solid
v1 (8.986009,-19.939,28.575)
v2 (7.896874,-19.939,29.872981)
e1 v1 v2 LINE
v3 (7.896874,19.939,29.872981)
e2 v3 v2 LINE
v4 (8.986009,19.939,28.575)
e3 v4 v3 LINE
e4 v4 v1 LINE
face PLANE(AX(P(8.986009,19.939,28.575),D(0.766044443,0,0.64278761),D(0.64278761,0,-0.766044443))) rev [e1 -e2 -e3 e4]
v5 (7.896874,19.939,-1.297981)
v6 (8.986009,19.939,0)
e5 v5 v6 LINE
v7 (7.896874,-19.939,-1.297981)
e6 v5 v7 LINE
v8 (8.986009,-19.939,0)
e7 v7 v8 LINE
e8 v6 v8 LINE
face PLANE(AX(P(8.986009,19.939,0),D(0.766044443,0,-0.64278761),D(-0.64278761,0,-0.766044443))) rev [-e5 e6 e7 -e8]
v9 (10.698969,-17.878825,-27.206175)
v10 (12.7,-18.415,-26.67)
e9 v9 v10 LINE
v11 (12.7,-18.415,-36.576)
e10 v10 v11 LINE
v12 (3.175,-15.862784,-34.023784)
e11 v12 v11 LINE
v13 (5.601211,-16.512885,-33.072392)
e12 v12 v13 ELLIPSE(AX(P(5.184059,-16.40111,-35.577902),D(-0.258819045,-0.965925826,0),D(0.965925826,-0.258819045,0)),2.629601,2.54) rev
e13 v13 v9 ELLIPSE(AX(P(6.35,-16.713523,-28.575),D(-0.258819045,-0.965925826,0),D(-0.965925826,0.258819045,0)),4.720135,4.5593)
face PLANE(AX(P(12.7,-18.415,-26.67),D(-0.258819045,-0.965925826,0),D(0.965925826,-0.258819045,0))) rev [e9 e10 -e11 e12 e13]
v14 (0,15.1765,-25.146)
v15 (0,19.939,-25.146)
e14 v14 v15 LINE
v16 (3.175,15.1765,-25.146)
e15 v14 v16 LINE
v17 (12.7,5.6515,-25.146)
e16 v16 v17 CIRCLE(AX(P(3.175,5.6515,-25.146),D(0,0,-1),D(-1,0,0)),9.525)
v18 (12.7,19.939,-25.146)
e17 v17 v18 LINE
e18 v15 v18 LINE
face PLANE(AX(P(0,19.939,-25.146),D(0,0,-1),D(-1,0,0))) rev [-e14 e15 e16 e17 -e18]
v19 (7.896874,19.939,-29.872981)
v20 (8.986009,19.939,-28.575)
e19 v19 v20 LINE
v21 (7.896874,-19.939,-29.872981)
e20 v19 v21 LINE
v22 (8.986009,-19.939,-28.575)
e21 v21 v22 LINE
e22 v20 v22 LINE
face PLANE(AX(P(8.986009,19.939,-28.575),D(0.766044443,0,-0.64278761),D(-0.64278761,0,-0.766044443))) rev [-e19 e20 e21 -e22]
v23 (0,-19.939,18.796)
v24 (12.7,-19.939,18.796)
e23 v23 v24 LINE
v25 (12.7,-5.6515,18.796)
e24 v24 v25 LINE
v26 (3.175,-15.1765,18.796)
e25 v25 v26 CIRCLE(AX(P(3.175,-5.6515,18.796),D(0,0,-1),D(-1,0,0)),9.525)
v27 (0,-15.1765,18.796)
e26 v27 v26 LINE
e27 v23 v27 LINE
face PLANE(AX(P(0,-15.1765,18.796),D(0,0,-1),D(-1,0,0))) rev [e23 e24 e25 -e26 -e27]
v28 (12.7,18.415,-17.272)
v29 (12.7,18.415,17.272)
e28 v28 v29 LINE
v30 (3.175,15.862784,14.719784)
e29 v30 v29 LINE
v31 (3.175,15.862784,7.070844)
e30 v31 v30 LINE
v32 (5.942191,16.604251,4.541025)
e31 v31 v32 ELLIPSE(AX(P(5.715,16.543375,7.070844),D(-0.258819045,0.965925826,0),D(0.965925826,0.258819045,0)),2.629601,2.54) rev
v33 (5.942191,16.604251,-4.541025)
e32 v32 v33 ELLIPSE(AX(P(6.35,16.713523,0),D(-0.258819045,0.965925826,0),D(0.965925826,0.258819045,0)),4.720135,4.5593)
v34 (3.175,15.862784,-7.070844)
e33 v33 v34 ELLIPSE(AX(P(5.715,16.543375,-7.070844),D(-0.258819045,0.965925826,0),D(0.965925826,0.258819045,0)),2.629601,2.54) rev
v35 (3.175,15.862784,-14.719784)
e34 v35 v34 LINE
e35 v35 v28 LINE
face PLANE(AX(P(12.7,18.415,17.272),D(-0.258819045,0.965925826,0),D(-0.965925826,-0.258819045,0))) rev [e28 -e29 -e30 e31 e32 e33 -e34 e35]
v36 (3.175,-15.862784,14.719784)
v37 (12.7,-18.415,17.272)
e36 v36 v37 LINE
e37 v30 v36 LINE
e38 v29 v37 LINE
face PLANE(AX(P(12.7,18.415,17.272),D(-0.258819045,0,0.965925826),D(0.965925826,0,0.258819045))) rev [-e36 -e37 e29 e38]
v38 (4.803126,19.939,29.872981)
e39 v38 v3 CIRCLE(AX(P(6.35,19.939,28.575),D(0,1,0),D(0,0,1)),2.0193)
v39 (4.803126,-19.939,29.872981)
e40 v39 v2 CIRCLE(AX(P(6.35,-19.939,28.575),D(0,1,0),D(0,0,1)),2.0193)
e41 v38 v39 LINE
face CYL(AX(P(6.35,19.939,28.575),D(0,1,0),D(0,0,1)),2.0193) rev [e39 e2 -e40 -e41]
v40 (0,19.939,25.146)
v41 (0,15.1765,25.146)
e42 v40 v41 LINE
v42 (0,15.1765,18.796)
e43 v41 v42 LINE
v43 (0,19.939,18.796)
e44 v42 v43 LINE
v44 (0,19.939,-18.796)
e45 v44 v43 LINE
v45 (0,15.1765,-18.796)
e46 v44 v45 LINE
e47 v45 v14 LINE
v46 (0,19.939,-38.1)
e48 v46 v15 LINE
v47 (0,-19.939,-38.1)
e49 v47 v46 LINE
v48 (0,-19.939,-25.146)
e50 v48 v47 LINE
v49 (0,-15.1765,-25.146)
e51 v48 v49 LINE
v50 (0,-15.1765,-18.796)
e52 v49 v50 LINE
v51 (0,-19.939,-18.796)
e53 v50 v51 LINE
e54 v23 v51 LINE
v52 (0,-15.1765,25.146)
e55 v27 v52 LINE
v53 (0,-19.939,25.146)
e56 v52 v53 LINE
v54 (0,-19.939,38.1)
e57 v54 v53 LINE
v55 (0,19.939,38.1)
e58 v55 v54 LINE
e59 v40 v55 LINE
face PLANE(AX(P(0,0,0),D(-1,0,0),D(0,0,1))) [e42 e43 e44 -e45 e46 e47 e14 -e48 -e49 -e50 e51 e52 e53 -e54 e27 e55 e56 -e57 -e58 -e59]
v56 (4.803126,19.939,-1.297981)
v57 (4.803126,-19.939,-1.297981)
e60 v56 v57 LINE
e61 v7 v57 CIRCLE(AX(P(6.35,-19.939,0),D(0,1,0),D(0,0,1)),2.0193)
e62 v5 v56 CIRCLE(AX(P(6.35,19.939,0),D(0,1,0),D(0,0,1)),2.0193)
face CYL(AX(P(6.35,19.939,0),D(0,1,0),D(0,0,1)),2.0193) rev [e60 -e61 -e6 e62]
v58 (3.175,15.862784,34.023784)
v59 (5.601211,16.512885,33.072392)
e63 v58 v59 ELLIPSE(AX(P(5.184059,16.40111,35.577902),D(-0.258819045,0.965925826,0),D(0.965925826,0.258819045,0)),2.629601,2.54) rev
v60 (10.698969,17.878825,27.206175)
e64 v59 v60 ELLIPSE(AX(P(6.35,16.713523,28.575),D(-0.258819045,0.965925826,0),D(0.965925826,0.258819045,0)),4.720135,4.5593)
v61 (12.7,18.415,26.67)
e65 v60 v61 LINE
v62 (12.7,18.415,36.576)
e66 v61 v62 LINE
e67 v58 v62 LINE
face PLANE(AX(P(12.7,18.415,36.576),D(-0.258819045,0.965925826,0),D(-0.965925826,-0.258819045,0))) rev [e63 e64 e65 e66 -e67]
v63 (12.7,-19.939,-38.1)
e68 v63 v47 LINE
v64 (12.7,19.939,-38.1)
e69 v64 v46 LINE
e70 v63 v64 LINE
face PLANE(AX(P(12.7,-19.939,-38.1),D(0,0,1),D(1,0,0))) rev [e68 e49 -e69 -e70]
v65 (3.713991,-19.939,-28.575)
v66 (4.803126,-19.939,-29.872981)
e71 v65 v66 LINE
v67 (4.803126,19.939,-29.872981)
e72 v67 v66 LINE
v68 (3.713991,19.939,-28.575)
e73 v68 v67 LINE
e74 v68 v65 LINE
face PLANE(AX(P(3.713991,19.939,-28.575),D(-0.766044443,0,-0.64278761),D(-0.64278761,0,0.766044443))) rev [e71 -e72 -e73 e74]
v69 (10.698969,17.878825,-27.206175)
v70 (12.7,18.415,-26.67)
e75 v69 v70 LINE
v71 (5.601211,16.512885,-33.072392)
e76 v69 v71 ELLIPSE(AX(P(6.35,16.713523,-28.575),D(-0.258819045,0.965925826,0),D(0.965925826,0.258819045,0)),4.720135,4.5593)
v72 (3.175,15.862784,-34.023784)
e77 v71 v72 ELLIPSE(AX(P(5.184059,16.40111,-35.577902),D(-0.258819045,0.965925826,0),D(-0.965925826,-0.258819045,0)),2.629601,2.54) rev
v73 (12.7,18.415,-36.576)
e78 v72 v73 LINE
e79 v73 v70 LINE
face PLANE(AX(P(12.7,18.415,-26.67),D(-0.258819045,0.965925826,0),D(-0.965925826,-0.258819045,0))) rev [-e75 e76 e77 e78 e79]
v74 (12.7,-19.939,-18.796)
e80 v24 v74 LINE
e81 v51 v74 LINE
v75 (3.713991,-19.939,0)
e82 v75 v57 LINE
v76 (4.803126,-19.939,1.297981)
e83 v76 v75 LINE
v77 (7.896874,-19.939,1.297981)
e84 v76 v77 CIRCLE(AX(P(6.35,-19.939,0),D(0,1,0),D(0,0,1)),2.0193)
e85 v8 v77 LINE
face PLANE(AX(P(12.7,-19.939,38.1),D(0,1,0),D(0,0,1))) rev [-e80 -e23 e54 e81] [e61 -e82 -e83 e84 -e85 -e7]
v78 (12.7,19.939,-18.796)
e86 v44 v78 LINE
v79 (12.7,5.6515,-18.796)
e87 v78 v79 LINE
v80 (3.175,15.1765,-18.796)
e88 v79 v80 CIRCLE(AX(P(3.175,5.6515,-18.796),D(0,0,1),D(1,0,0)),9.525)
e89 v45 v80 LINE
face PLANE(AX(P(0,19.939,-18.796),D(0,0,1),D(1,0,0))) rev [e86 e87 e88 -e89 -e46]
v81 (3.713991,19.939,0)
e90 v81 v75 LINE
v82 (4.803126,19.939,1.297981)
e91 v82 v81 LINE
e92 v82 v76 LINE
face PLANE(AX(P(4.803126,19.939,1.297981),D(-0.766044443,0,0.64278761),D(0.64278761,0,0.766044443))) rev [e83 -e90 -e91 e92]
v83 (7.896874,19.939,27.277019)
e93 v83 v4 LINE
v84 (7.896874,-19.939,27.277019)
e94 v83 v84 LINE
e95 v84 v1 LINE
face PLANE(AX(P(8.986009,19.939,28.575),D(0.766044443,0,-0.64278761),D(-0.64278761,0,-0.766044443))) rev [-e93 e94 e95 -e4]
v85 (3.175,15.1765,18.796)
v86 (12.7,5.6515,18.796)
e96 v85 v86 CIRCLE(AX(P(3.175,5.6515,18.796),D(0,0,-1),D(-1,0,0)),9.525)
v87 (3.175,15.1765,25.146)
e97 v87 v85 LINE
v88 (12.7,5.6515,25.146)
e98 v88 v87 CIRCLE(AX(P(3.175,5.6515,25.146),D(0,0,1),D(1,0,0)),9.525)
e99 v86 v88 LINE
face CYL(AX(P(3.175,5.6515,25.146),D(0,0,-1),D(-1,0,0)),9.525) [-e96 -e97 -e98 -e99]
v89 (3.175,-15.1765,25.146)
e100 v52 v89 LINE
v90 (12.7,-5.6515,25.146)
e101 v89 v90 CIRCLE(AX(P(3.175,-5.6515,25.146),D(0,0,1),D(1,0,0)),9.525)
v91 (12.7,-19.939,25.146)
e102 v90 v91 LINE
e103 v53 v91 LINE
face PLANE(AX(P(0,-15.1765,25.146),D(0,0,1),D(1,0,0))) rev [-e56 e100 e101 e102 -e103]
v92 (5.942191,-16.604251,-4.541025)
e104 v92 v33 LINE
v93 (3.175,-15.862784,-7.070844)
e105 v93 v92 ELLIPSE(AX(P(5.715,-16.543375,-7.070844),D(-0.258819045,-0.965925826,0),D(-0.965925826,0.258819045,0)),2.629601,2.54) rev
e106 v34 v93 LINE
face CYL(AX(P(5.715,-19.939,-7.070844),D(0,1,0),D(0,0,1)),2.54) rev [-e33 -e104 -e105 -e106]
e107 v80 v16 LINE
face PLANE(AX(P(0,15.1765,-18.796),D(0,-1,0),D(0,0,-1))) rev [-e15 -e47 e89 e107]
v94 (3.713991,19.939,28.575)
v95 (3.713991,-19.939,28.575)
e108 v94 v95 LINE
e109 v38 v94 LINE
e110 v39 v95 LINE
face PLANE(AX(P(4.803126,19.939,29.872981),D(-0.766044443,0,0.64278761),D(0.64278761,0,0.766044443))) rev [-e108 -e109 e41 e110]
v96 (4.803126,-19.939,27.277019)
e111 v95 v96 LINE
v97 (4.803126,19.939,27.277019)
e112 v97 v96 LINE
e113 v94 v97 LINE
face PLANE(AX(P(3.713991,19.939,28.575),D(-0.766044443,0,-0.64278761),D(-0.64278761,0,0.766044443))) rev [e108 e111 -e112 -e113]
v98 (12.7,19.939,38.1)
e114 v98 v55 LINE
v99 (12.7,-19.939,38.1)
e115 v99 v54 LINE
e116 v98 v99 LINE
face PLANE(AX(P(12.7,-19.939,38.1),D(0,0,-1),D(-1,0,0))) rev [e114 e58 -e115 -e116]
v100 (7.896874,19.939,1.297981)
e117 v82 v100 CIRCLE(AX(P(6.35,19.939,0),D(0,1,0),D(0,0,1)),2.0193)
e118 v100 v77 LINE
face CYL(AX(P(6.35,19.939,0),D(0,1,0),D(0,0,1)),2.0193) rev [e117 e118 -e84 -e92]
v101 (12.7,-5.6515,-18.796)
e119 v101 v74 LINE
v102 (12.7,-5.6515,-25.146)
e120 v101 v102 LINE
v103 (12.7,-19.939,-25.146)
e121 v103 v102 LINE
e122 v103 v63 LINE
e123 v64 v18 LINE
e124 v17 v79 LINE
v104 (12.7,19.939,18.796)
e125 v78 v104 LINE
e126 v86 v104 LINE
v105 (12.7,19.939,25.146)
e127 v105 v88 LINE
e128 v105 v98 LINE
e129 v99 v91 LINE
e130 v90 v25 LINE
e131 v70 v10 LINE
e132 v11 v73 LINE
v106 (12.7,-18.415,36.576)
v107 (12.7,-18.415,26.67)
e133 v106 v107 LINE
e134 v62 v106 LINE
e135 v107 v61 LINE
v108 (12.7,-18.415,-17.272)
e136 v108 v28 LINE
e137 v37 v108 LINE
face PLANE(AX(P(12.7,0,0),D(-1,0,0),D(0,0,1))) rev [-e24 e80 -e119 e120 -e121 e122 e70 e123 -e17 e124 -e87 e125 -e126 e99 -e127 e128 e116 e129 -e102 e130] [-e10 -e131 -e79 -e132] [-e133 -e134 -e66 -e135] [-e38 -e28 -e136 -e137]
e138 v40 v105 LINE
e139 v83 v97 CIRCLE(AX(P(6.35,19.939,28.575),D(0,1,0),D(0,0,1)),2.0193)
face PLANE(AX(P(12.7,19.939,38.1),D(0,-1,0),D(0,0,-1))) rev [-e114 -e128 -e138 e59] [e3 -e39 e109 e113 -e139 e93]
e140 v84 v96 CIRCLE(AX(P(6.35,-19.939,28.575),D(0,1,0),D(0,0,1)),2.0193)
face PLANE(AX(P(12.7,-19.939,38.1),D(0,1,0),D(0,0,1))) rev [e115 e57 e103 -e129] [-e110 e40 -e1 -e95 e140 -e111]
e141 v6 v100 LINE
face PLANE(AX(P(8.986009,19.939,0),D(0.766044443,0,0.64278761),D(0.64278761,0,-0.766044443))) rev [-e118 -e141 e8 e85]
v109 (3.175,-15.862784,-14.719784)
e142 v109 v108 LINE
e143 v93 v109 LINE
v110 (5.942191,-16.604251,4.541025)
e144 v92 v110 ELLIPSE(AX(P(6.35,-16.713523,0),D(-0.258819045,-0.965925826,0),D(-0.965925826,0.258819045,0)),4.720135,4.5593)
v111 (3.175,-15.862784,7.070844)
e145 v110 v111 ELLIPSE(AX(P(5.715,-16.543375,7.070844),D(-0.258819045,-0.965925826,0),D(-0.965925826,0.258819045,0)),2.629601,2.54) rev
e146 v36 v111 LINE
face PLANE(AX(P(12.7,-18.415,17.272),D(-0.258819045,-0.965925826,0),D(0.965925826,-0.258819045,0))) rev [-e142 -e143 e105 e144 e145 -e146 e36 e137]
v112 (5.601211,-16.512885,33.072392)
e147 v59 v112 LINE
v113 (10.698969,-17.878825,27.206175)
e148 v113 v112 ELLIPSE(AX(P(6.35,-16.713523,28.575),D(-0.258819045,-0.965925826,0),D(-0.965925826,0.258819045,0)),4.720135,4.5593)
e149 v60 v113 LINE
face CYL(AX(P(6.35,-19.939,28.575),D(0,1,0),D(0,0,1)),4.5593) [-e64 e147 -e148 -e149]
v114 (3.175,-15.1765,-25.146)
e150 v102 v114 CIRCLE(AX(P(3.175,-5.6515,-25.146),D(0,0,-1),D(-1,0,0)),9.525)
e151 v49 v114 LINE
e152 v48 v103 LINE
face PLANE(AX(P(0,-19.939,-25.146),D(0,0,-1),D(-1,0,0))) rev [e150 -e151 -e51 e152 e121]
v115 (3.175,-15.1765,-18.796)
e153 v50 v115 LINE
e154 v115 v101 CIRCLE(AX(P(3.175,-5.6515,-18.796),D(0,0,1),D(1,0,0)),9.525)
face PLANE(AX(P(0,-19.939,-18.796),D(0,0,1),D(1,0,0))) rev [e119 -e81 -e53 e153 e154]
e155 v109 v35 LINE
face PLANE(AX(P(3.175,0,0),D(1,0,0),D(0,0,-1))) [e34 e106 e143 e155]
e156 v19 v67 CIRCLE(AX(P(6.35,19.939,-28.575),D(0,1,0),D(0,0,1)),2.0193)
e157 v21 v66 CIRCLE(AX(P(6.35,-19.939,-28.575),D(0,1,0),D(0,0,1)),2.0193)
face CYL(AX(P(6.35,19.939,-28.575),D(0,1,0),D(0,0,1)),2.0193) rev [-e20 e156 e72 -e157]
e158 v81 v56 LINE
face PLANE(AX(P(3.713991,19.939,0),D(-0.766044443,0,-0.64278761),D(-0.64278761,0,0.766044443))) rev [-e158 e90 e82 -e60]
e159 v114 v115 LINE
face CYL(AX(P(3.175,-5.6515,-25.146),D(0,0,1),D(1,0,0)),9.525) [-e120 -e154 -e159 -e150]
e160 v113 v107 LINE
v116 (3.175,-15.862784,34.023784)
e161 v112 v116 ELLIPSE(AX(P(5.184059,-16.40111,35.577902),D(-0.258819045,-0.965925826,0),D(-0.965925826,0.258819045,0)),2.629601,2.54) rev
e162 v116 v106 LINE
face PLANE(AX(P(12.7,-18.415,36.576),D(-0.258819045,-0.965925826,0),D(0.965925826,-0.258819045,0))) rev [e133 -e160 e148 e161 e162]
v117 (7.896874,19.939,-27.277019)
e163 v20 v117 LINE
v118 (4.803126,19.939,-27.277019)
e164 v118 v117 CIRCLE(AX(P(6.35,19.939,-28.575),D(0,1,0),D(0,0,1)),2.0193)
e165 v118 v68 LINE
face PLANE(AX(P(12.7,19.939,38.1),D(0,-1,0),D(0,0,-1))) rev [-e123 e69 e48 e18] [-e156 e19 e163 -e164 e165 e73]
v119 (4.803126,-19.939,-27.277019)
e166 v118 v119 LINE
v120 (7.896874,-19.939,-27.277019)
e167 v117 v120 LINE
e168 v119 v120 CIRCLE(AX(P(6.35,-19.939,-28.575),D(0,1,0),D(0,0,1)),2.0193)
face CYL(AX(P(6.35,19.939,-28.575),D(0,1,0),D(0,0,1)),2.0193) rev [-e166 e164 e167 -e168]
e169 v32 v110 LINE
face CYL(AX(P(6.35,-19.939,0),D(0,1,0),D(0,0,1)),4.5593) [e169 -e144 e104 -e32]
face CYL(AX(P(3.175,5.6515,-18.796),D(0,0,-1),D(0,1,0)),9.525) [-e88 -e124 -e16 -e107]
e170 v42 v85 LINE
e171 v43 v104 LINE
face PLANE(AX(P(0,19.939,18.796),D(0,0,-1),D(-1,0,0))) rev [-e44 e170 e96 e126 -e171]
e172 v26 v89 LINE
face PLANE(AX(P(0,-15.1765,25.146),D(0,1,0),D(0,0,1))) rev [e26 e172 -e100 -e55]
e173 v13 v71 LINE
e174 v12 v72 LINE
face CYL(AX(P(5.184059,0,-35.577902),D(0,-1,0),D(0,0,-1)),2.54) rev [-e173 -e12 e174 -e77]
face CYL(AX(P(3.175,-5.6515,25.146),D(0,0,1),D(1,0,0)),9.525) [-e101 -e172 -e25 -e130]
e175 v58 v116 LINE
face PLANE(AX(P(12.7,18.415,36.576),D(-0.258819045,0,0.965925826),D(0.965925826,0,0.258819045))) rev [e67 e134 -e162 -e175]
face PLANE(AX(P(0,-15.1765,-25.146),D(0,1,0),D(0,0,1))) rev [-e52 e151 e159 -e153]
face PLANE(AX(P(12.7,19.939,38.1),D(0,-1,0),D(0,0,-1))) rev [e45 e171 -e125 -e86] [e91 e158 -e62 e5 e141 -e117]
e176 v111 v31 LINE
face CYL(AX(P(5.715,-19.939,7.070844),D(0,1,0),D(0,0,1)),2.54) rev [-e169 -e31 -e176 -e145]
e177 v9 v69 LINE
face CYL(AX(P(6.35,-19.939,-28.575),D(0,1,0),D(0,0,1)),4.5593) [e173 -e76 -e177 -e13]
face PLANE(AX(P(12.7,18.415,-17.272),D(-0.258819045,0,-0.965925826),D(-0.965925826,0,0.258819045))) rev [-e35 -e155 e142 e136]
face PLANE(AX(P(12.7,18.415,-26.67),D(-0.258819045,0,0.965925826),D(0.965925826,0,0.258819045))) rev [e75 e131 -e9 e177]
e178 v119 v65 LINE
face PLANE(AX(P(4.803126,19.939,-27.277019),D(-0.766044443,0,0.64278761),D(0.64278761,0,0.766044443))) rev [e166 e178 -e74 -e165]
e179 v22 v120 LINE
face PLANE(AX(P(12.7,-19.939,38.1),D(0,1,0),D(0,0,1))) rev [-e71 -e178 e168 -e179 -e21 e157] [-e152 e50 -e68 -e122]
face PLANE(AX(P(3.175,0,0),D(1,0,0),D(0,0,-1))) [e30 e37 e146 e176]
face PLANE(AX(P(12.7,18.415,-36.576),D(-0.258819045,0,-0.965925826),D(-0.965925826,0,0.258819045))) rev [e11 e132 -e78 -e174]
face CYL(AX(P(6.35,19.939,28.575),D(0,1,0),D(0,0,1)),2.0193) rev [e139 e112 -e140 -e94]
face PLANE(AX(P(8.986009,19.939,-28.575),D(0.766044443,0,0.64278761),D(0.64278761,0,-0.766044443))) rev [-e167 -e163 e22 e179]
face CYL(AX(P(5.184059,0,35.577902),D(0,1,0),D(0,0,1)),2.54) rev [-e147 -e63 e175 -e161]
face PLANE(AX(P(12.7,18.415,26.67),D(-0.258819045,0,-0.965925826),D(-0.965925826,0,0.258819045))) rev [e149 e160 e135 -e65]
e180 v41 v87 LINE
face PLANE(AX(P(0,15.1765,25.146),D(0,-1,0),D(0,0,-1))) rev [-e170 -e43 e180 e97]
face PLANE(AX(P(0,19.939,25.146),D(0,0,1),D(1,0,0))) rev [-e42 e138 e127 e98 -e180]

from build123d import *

# Parameters (mm, degrees)
SKETCH1_W                    = 76.2
SKETCH1_H                    = 39.878
BOSS_EXTRUDE1_DEPTH          = 12.7
SKETCH2_W                    = 6.35
SKETCH2_H                    = 4.7625
CUT_EXTRUDE1_DEPTH           = 45.83819489
F_10_32_TAPPED_HOLE1_D       = 4.0386
FILLET1_R                    = 9.525
SKETCH6_W                    = 34.544
SKETCH6_H                    = 36.83
CUT_EXTRUDE3_DEPTH           = 9.525
CUT_EXTRUDE3_DRAFT           = -15
SKETCH6_W_2                  = 9.906
CUT_EXTRUDE3_PROFILE_2_DEPTH = 9.525
CUT_EXTRUDE3_PROFILE_2_DRAFT = -15
CUT_EXTRUDE3_PROFILE_3_DEPTH = 9.525
CUT_EXTRUDE3_PROFILE_3_DRAFT = -15
SKETCH7_R                    = 4.5593
SKETCH7_R_2                  = 2.0193
EXTRUDE_THIN1_DEPTH          = 39.878
DELETEFACE1_START            = 18.796
DELETEFACE1_DEPTH            = 6.35
DELETEFACE1_START_2          = -25.146
DELETEFACE1_2_DEPTH          = 6.35
FILLET2_R                    = 2.54
CUT_EXTRUDE4_DEPTH           = 57.596421146


with BuildPart() as part:
    # Sketch1 → Boss-Extrude1 (new body)
    with BuildSketch(Plane(origin=(0, 0, 0), x_dir=(0, 0, -1), z_dir=(1, 0, 0))):
        Rectangle(SKETCH1_W, SKETCH1_H)
    extrude(amount=BOSS_EXTRUDE1_DEPTH)

    # Sketch2 → Cut-Extrude1 (cut, through all)
    with BuildSketch(Plane(origin=(12.7, 0, 0), x_dir=(0, 0, -1), z_dir=(1, 0, 0))):
        with Locations((-21.971, 17.55775)):
            Rectangle(SKETCH2_W, SKETCH2_H)
        with Locations((21.971, 17.55775)):
            Rectangle(SKETCH2_W, SKETCH2_H)
        with Locations((-21.971, -17.55775)):
            Rectangle(SKETCH2_W, SKETCH2_H)
        with Locations((21.971, -17.55775)):
            Rectangle(SKETCH2_W, SKETCH2_H)
    extrude(amount=-CUT_EXTRUDE1_DEPTH, mode=Mode.SUBTRACT)

    # #10-32 Tapped Hole1 (through all)
    with Locations(Plane(origin=(0, 19.939, 0), x_dir=(1, 0, 0), z_dir=(0, 1, 0))):
        with Locations((6.35, 28.575), (6.35, 0), (6.35, -28.575)):
            Hole(F_10_32_TAPPED_HOLE1_D / 2)

    # Fillet1
    fillet1_edges = [part.edges().sort_by_distance(p)[0] for p in [
        (12.7, 15.1765, -21.971),
        (12.7, -15.1765, 21.971),
        (12.7, -15.1765, -21.971),
        (12.7, 15.1765, 21.971),
    ]]
    fillet(fillet1_edges, radius=FILLET1_R)


with BuildPart() as cut_extrude3_tool:
    # Sketch6 → Cut-Extrude3 (with draft: the straight prism first)
    with BuildSketch(Plane(origin=(12.7, 0, 0), x_dir=(0, 0, -1), z_dir=(1, 0, 0))):
        Rectangle(SKETCH6_W, SKETCH6_H)
    extrude(amount=-CUT_EXTRUDE3_DEPTH)
    # Cut-Extrude3: the draft: its side faces are tilted about the plane it starts from
    cut_extrude3_sides = [cut_extrude3_tool.faces().sort_by_distance(p)[0] for p in [
        (7.9375, 0, 17.272),
        (7.9375, -18.415, 0),
        (7.9375, 0, -17.272),
        (7.9375, 18.415, 0),
    ]]
    draft(cut_extrude3_sides, Plane(origin=(12.7, 0, 0), x_dir=(0, 0, -1), z_dir=(1, 0, 0)), CUT_EXTRUDE3_DRAFT)


with BuildPart() as part_1:
    add(part.part)

    # Cut-Extrude3: cut by cut_extrude3_tool
    add(cut_extrude3_tool.part, mode=Mode.SUBTRACT)


with BuildPart() as cut_extrude3_profile_2_tool:
    # Sketch6 → Cut-Extrude3 profile 2 (with draft: the straight prism first)
    with BuildSketch(Plane(origin=(12.7, 0, 0), x_dir=(0, 0, -1), z_dir=(1, 0, 0))):
        with Locations((31.623, 0)):
            Rectangle(SKETCH6_W_2, SKETCH6_H)
    extrude(amount=-CUT_EXTRUDE3_PROFILE_2_DEPTH)
    # Cut-Extrude3 profile 2: the draft: its side faces are tilted about the plane it starts from
    cut_extrude3_profile_2_sides = [cut_extrude3_profile_2_tool.faces().sort_by_distance(p)[0] for p in [
        (7.9375, 0, -26.67),
        (7.9375, -18.415, -31.623),
        (7.9375, 0, -36.576),
        (7.9375, 18.415, -31.623),
    ]]
    draft(cut_extrude3_profile_2_sides, Plane(origin=(12.7, 0, 0), x_dir=(0, 0, -1), z_dir=(1, 0, 0)), CUT_EXTRUDE3_PROFILE_2_DRAFT)


with BuildPart() as part_2:
    add(part_1.part)

    # Cut-Extrude3 profile 2: cut by cut_extrude3_profile_2_tool
    add(cut_extrude3_profile_2_tool.part, mode=Mode.SUBTRACT)


with BuildPart() as cut_extrude3_profile_3_tool:
    # Sketch6 → Cut-Extrude3 profile 3 (with draft: the straight prism first)
    with BuildSketch(Plane(origin=(12.7, 0, 0), x_dir=(0, 0, -1), z_dir=(1, 0, 0))):
        with Locations((-31.623, 0)):
            Rectangle(SKETCH6_W_2, SKETCH6_H)
    extrude(amount=-CUT_EXTRUDE3_PROFILE_3_DEPTH)
    # Cut-Extrude3 profile 3: the draft: its side faces are tilted about the plane it starts from
    cut_extrude3_profile_3_sides = [cut_extrude3_profile_3_tool.faces().sort_by_distance(p)[0] for p in [
        (7.9375, 0, 36.576),
        (7.9375, -18.415, 31.623),
        (7.9375, 0, 26.67),
        (7.9375, 18.415, 31.623),
    ]]
    draft(cut_extrude3_profile_3_sides, Plane(origin=(12.7, 0, 0), x_dir=(0, 0, -1), z_dir=(1, 0, 0)), CUT_EXTRUDE3_PROFILE_3_DRAFT)


with BuildPart() as part_3:
    add(part_2.part)

    # Cut-Extrude3 profile 3: cut by cut_extrude3_profile_3_tool
    add(cut_extrude3_profile_3_tool.part, mode=Mode.SUBTRACT)

    # Sketch7 → Extrude-Thin1 (add, through all)
    # profile 1 of 3: a face of its own
    with BuildSketch(Plane(origin=(0, 19.939, 0), x_dir=(1, 0, 0), z_dir=(0, 1, 0))):
        with Locations((6.35, -28.575)):
            Circle(SKETCH7_R)
        with Locations((6.35, -28.575)):
            Circle(SKETCH7_R_2, mode=Mode.SUBTRACT)
    # profile 2 of 3: a face of its own
    with BuildSketch(Plane(origin=(0, 19.939, 0), x_dir=(1, 0, 0), z_dir=(0, 1, 0))):
        with Locations((6.35, 0)):
            Circle(SKETCH7_R)
        with Locations((6.35, 0)):
            Circle(SKETCH7_R_2, mode=Mode.SUBTRACT)
    # profile 3 of 3: a face of its own
    with BuildSketch(Plane(origin=(0, 19.939, 0), x_dir=(1, 0, 0), z_dir=(0, 1, 0))):
        with Locations((6.35, 28.575)):
            Circle(SKETCH7_R)
        with Locations((6.35, 28.575)):
            Circle(SKETCH7_R_2, mode=Mode.SUBTRACT)
    extrude(amount=-EXTRUDE_THIN1_DEPTH)

    # DeleteFace1: read off the stored shape, not the designer's step
    # DeleteFace1 outline → DeleteFace1 (cut)
    with BuildSketch(Plane.XY.offset(DELETEFACE1_START)):
        with BuildLine():
            ThreePointArc((3.175, 15.1765), (9.910192091, 12.386692091), (12.7, 5.6515))
            Line((12.7, 5.6515), (12.7, 19.939))
            Line((12.7, 19.939), (0, 19.939))
            Line((0, 19.939), (0, 15.1765))
            Line((0, 15.1765), (3.175, 15.1765))
        make_face()
        with BuildLine():
            Line((12.7, -19.939), (12.7, -5.6515))
            ThreePointArc((12.7, -5.6515), (9.910192091, -12.386692091), (3.175, -15.1765))
            Line((3.175, -15.1765), (0, -15.1765))
            Line((0, -15.1765), (0, -19.939))
            Line((0, -19.939), (12.7, -19.939))
        make_face()
    extrude(amount=DELETEFACE1_DEPTH, mode=Mode.SUBTRACT)

    # DeleteFace1 2 outline → DeleteFace1 2 (cut)
    with BuildSketch(Plane.XY.offset(DELETEFACE1_START_2)):
        with BuildLine():
            ThreePointArc((3.175, 15.1765), (9.910192091, 12.386692091), (12.7, 5.6515))
            Line((12.7, 5.6515), (12.7, 19.939))
            Line((12.7, 19.939), (0, 19.939))
            Line((0, 19.939), (0, 15.1765))
            Line((0, 15.1765), (3.175, 15.1765))
        make_face()
        with BuildLine():
            Line((12.7, -19.939), (12.7, -5.6515))
            ThreePointArc((12.7, -5.6515), (9.910192091, -12.386692091), (3.175, -15.1765))
            Line((3.175, -15.1765), (0, -15.1765))
            Line((0, -15.1765), (0, -19.939))
            Line((0, -19.939), (12.7, -19.939))
        make_face()
    extrude(amount=DELETEFACE1_2_DEPTH, mode=Mode.SUBTRACT)

    # Fillet2
    # the kernel refuses this fillet: 2.54 mm, written as the material it adds along each edge
    with BuildSketch(Plane(origin=(3.175, -25.359661976, -3.27209283), x_dir=(0, 0, -1), z_dir=(0, 1, 0))) as fillet2_piece_1_section:
        with BuildLine():
            CenterArc((3.798751213, -2.54), FILLET2_R, 90, 95.131704374)
            ThreePointArc((1.268932235, -2.767191413), (0.872245463, -1.274558842), (0, 0))
            Line((0, 0), (3.798751213, 0))
        make_face()
    fillet2_piece_1 = extrude(amount=50.719323951, mode=Mode.PRIVATE)
    fillet2_piece_1 = split(fillet2_piece_1, bisect_by=Plane(origin=(5.549219508, -16.498954142, -3.27209283), z_dir=(0.25881904510252135, 0.9659258262890681, 0)), keep=Keep.TOP, mode=Mode.PRIVATE)
    fillet2_piece_1 = split(fillet2_piece_1, bisect_by=Plane(origin=(-7.130611479, 13.101403669, -3.27209283), z_dir=(0.25881904510252135, -0.9659258262890681, 0)), keep=Keep.TOP, mode=Mode.PRIVATE)
    add(fillet2_piece_1)
    with BuildSketch(Plane(origin=(3.175, -25.359661976, 3.27209283), x_dir=(0.9089856543258207, 0, 0.4168273986074566), z_dir=(0, 1, 0))) as fillet2_piece_2_section:
        with BuildLine():
            CenterArc((3.892247148, -2.394268765), FILLET2_R, 109.502744929, 95.131704374)
            Line((1.583423586, -3.453010357), (0, 0))
            ThreePointArc((0, 0), (1.52213151, -0.261587567), (3.04426302, 0))
        make_face()
    fillet2_piece_2 = extrude(amount=50.719323951, mode=Mode.PRIVATE)
    fillet2_piece_2 = split(fillet2_piece_2, bisect_by=Plane(origin=(5.549219508, -16.498954142, 3.27209283), z_dir=(0.25881904510252135, 0.9659258262890681, 0)), keep=Keep.TOP, mode=Mode.PRIVATE)
    fillet2_piece_2 = split(fillet2_piece_2, bisect_by=Plane(origin=(-7.130611479, 13.101403669, 3.27209283), z_dir=(0.25881904510252135, -0.9659258262890681, 0)), keep=Keep.TOP, mode=Mode.PRIVATE)
    add(fillet2_piece_2)
    with BuildSketch(Plane(origin=(3.175, -22.657937307, -31.84709283), x_dir=(0, 0, -1), z_dir=(0, 1, 0))) as fillet2_piece_3_section:
        with BuildLine():
            CenterArc((3.73080949, -2.009058502), FILLET2_R, 127.723943203, 61.728755264)
            ThreePointArc((1.225298821, -2.426211095), (0.797654993, -1.119672984), (0, 0))
            Line((0, 0), (2.176691112, 0))
        make_face()
    fillet2_piece_3 = extrude(amount=45.315874614, mode=Mode.PRIVATE)
    fillet2_piece_3 = split(fillet2_piece_3, bisect_by=Plane(origin=(4.873788341, -16.317972906, -31.84709283), z_dir=(0.25881904510252135, 0.9659258262890681, 0)), keep=Keep.TOP, mode=Mode.PRIVATE)
    fillet2_piece_3 = split(fillet2_piece_3, bisect_by=Plane(origin=(-6.455180312, 13.282384904, -31.84709283), z_dir=(0.25881904510252135, -0.9659258262890681, 0)), keep=Keep.TOP, mode=Mode.PRIVATE)
    add(fillet2_piece_3)
    with BuildSketch(Plane(origin=(3.175, -22.657937307, 31.84709283), x_dir=(0.8926255836617852, 0, 0.4507988103272426), z_dir=(0, 1, 0))) as fillet2_piece_4_section:
        with BuildLine():
            CenterArc((3.475181498, -2.424534816), FILLET2_R, 107.342247882, 61.728755264)
            Line((0.981249764, -1.942970174), (0, 0))
            ThreePointArc((0, 0), (1.359030673, -0.207260005), (2.718061346, 0))
        make_face()
    fillet2_piece_4 = extrude(amount=45.315874614, mode=Mode.PRIVATE)
    fillet2_piece_4 = split(fillet2_piece_4, bisect_by=Plane(origin=(-6.455180312, 13.282384904, 31.84709283), z_dir=(0.25881904510252135, -0.9659258262890681, 0)), keep=Keep.TOP, mode=Mode.PRIVATE)
    fillet2_piece_4 = split(fillet2_piece_4, bisect_by=Plane(origin=(4.873788341, -16.317972906, 31.84709283), z_dir=(0.25881904510252135, 0.9659258262890681, 0)), keep=Keep.TOP, mode=Mode.PRIVATE)
    add(fillet2_piece_4)

    # Sketch8 → Cut-Extrude4 (cut, through all)
    with BuildSketch(Plane.XZ.offset(19.939)):
        with BuildLine():
            Line((8.986008939, 28.575), (7.896873544, 29.87298102))
            ThreePointArc((7.896873544, 29.87298102), (6.35, 30.5943), (4.803126456, 29.87298102))
            Line((4.803126456, 29.87298102), (3.713991061, 28.575))
            Line((3.713991061, 28.575), (4.803126456, 27.27701898))
            ThreePointArc((4.803126456, 27.27701898), (6.35, 26.5557), (7.896873544, 27.27701898))
            Line((7.896873544, 27.27701898), (8.986008939, 28.575))
        make_face()
        with BuildLine():
            Line((8.986008939, 0), (7.896873544, 1.29798102))
            ThreePointArc((7.896873544, 1.29798102), (6.35, 2.0193), (4.803126456, 1.29798102))
            Line((4.803126456, 1.29798102), (3.713991061, 0))
            Line((3.713991061, 0), (4.803126456, -1.29798102))
            ThreePointArc((4.803126456, -1.29798102), (6.35, -2.0193), (7.896873544, -1.29798102))
            Line((7.896873544, -1.29798102), (8.986008939, 0))
        make_face()
        with BuildLine():
            Line((8.986008939, -28.575), (7.896873544, -27.27701898))
            ThreePointArc((7.896873544, -27.27701898), (6.35, -26.5557), (4.803126456, -27.27701898))
            Line((4.803126456, -27.27701898), (3.713991061, -28.575))
            Line((3.713991061, -28.575), (4.803126456, -29.87298102))
            ThreePointArc((4.803126456, -29.87298102), (6.35, -30.5943), (7.896873544, -29.87298102))
            Line((7.896873544, -29.87298102), (8.986008939, -28.575))
        make_face()
    extrude(amount=-CUT_EXTRUDE4_DEPTH, mode=Mode.SUBTRACT)


solid = part_3.part
